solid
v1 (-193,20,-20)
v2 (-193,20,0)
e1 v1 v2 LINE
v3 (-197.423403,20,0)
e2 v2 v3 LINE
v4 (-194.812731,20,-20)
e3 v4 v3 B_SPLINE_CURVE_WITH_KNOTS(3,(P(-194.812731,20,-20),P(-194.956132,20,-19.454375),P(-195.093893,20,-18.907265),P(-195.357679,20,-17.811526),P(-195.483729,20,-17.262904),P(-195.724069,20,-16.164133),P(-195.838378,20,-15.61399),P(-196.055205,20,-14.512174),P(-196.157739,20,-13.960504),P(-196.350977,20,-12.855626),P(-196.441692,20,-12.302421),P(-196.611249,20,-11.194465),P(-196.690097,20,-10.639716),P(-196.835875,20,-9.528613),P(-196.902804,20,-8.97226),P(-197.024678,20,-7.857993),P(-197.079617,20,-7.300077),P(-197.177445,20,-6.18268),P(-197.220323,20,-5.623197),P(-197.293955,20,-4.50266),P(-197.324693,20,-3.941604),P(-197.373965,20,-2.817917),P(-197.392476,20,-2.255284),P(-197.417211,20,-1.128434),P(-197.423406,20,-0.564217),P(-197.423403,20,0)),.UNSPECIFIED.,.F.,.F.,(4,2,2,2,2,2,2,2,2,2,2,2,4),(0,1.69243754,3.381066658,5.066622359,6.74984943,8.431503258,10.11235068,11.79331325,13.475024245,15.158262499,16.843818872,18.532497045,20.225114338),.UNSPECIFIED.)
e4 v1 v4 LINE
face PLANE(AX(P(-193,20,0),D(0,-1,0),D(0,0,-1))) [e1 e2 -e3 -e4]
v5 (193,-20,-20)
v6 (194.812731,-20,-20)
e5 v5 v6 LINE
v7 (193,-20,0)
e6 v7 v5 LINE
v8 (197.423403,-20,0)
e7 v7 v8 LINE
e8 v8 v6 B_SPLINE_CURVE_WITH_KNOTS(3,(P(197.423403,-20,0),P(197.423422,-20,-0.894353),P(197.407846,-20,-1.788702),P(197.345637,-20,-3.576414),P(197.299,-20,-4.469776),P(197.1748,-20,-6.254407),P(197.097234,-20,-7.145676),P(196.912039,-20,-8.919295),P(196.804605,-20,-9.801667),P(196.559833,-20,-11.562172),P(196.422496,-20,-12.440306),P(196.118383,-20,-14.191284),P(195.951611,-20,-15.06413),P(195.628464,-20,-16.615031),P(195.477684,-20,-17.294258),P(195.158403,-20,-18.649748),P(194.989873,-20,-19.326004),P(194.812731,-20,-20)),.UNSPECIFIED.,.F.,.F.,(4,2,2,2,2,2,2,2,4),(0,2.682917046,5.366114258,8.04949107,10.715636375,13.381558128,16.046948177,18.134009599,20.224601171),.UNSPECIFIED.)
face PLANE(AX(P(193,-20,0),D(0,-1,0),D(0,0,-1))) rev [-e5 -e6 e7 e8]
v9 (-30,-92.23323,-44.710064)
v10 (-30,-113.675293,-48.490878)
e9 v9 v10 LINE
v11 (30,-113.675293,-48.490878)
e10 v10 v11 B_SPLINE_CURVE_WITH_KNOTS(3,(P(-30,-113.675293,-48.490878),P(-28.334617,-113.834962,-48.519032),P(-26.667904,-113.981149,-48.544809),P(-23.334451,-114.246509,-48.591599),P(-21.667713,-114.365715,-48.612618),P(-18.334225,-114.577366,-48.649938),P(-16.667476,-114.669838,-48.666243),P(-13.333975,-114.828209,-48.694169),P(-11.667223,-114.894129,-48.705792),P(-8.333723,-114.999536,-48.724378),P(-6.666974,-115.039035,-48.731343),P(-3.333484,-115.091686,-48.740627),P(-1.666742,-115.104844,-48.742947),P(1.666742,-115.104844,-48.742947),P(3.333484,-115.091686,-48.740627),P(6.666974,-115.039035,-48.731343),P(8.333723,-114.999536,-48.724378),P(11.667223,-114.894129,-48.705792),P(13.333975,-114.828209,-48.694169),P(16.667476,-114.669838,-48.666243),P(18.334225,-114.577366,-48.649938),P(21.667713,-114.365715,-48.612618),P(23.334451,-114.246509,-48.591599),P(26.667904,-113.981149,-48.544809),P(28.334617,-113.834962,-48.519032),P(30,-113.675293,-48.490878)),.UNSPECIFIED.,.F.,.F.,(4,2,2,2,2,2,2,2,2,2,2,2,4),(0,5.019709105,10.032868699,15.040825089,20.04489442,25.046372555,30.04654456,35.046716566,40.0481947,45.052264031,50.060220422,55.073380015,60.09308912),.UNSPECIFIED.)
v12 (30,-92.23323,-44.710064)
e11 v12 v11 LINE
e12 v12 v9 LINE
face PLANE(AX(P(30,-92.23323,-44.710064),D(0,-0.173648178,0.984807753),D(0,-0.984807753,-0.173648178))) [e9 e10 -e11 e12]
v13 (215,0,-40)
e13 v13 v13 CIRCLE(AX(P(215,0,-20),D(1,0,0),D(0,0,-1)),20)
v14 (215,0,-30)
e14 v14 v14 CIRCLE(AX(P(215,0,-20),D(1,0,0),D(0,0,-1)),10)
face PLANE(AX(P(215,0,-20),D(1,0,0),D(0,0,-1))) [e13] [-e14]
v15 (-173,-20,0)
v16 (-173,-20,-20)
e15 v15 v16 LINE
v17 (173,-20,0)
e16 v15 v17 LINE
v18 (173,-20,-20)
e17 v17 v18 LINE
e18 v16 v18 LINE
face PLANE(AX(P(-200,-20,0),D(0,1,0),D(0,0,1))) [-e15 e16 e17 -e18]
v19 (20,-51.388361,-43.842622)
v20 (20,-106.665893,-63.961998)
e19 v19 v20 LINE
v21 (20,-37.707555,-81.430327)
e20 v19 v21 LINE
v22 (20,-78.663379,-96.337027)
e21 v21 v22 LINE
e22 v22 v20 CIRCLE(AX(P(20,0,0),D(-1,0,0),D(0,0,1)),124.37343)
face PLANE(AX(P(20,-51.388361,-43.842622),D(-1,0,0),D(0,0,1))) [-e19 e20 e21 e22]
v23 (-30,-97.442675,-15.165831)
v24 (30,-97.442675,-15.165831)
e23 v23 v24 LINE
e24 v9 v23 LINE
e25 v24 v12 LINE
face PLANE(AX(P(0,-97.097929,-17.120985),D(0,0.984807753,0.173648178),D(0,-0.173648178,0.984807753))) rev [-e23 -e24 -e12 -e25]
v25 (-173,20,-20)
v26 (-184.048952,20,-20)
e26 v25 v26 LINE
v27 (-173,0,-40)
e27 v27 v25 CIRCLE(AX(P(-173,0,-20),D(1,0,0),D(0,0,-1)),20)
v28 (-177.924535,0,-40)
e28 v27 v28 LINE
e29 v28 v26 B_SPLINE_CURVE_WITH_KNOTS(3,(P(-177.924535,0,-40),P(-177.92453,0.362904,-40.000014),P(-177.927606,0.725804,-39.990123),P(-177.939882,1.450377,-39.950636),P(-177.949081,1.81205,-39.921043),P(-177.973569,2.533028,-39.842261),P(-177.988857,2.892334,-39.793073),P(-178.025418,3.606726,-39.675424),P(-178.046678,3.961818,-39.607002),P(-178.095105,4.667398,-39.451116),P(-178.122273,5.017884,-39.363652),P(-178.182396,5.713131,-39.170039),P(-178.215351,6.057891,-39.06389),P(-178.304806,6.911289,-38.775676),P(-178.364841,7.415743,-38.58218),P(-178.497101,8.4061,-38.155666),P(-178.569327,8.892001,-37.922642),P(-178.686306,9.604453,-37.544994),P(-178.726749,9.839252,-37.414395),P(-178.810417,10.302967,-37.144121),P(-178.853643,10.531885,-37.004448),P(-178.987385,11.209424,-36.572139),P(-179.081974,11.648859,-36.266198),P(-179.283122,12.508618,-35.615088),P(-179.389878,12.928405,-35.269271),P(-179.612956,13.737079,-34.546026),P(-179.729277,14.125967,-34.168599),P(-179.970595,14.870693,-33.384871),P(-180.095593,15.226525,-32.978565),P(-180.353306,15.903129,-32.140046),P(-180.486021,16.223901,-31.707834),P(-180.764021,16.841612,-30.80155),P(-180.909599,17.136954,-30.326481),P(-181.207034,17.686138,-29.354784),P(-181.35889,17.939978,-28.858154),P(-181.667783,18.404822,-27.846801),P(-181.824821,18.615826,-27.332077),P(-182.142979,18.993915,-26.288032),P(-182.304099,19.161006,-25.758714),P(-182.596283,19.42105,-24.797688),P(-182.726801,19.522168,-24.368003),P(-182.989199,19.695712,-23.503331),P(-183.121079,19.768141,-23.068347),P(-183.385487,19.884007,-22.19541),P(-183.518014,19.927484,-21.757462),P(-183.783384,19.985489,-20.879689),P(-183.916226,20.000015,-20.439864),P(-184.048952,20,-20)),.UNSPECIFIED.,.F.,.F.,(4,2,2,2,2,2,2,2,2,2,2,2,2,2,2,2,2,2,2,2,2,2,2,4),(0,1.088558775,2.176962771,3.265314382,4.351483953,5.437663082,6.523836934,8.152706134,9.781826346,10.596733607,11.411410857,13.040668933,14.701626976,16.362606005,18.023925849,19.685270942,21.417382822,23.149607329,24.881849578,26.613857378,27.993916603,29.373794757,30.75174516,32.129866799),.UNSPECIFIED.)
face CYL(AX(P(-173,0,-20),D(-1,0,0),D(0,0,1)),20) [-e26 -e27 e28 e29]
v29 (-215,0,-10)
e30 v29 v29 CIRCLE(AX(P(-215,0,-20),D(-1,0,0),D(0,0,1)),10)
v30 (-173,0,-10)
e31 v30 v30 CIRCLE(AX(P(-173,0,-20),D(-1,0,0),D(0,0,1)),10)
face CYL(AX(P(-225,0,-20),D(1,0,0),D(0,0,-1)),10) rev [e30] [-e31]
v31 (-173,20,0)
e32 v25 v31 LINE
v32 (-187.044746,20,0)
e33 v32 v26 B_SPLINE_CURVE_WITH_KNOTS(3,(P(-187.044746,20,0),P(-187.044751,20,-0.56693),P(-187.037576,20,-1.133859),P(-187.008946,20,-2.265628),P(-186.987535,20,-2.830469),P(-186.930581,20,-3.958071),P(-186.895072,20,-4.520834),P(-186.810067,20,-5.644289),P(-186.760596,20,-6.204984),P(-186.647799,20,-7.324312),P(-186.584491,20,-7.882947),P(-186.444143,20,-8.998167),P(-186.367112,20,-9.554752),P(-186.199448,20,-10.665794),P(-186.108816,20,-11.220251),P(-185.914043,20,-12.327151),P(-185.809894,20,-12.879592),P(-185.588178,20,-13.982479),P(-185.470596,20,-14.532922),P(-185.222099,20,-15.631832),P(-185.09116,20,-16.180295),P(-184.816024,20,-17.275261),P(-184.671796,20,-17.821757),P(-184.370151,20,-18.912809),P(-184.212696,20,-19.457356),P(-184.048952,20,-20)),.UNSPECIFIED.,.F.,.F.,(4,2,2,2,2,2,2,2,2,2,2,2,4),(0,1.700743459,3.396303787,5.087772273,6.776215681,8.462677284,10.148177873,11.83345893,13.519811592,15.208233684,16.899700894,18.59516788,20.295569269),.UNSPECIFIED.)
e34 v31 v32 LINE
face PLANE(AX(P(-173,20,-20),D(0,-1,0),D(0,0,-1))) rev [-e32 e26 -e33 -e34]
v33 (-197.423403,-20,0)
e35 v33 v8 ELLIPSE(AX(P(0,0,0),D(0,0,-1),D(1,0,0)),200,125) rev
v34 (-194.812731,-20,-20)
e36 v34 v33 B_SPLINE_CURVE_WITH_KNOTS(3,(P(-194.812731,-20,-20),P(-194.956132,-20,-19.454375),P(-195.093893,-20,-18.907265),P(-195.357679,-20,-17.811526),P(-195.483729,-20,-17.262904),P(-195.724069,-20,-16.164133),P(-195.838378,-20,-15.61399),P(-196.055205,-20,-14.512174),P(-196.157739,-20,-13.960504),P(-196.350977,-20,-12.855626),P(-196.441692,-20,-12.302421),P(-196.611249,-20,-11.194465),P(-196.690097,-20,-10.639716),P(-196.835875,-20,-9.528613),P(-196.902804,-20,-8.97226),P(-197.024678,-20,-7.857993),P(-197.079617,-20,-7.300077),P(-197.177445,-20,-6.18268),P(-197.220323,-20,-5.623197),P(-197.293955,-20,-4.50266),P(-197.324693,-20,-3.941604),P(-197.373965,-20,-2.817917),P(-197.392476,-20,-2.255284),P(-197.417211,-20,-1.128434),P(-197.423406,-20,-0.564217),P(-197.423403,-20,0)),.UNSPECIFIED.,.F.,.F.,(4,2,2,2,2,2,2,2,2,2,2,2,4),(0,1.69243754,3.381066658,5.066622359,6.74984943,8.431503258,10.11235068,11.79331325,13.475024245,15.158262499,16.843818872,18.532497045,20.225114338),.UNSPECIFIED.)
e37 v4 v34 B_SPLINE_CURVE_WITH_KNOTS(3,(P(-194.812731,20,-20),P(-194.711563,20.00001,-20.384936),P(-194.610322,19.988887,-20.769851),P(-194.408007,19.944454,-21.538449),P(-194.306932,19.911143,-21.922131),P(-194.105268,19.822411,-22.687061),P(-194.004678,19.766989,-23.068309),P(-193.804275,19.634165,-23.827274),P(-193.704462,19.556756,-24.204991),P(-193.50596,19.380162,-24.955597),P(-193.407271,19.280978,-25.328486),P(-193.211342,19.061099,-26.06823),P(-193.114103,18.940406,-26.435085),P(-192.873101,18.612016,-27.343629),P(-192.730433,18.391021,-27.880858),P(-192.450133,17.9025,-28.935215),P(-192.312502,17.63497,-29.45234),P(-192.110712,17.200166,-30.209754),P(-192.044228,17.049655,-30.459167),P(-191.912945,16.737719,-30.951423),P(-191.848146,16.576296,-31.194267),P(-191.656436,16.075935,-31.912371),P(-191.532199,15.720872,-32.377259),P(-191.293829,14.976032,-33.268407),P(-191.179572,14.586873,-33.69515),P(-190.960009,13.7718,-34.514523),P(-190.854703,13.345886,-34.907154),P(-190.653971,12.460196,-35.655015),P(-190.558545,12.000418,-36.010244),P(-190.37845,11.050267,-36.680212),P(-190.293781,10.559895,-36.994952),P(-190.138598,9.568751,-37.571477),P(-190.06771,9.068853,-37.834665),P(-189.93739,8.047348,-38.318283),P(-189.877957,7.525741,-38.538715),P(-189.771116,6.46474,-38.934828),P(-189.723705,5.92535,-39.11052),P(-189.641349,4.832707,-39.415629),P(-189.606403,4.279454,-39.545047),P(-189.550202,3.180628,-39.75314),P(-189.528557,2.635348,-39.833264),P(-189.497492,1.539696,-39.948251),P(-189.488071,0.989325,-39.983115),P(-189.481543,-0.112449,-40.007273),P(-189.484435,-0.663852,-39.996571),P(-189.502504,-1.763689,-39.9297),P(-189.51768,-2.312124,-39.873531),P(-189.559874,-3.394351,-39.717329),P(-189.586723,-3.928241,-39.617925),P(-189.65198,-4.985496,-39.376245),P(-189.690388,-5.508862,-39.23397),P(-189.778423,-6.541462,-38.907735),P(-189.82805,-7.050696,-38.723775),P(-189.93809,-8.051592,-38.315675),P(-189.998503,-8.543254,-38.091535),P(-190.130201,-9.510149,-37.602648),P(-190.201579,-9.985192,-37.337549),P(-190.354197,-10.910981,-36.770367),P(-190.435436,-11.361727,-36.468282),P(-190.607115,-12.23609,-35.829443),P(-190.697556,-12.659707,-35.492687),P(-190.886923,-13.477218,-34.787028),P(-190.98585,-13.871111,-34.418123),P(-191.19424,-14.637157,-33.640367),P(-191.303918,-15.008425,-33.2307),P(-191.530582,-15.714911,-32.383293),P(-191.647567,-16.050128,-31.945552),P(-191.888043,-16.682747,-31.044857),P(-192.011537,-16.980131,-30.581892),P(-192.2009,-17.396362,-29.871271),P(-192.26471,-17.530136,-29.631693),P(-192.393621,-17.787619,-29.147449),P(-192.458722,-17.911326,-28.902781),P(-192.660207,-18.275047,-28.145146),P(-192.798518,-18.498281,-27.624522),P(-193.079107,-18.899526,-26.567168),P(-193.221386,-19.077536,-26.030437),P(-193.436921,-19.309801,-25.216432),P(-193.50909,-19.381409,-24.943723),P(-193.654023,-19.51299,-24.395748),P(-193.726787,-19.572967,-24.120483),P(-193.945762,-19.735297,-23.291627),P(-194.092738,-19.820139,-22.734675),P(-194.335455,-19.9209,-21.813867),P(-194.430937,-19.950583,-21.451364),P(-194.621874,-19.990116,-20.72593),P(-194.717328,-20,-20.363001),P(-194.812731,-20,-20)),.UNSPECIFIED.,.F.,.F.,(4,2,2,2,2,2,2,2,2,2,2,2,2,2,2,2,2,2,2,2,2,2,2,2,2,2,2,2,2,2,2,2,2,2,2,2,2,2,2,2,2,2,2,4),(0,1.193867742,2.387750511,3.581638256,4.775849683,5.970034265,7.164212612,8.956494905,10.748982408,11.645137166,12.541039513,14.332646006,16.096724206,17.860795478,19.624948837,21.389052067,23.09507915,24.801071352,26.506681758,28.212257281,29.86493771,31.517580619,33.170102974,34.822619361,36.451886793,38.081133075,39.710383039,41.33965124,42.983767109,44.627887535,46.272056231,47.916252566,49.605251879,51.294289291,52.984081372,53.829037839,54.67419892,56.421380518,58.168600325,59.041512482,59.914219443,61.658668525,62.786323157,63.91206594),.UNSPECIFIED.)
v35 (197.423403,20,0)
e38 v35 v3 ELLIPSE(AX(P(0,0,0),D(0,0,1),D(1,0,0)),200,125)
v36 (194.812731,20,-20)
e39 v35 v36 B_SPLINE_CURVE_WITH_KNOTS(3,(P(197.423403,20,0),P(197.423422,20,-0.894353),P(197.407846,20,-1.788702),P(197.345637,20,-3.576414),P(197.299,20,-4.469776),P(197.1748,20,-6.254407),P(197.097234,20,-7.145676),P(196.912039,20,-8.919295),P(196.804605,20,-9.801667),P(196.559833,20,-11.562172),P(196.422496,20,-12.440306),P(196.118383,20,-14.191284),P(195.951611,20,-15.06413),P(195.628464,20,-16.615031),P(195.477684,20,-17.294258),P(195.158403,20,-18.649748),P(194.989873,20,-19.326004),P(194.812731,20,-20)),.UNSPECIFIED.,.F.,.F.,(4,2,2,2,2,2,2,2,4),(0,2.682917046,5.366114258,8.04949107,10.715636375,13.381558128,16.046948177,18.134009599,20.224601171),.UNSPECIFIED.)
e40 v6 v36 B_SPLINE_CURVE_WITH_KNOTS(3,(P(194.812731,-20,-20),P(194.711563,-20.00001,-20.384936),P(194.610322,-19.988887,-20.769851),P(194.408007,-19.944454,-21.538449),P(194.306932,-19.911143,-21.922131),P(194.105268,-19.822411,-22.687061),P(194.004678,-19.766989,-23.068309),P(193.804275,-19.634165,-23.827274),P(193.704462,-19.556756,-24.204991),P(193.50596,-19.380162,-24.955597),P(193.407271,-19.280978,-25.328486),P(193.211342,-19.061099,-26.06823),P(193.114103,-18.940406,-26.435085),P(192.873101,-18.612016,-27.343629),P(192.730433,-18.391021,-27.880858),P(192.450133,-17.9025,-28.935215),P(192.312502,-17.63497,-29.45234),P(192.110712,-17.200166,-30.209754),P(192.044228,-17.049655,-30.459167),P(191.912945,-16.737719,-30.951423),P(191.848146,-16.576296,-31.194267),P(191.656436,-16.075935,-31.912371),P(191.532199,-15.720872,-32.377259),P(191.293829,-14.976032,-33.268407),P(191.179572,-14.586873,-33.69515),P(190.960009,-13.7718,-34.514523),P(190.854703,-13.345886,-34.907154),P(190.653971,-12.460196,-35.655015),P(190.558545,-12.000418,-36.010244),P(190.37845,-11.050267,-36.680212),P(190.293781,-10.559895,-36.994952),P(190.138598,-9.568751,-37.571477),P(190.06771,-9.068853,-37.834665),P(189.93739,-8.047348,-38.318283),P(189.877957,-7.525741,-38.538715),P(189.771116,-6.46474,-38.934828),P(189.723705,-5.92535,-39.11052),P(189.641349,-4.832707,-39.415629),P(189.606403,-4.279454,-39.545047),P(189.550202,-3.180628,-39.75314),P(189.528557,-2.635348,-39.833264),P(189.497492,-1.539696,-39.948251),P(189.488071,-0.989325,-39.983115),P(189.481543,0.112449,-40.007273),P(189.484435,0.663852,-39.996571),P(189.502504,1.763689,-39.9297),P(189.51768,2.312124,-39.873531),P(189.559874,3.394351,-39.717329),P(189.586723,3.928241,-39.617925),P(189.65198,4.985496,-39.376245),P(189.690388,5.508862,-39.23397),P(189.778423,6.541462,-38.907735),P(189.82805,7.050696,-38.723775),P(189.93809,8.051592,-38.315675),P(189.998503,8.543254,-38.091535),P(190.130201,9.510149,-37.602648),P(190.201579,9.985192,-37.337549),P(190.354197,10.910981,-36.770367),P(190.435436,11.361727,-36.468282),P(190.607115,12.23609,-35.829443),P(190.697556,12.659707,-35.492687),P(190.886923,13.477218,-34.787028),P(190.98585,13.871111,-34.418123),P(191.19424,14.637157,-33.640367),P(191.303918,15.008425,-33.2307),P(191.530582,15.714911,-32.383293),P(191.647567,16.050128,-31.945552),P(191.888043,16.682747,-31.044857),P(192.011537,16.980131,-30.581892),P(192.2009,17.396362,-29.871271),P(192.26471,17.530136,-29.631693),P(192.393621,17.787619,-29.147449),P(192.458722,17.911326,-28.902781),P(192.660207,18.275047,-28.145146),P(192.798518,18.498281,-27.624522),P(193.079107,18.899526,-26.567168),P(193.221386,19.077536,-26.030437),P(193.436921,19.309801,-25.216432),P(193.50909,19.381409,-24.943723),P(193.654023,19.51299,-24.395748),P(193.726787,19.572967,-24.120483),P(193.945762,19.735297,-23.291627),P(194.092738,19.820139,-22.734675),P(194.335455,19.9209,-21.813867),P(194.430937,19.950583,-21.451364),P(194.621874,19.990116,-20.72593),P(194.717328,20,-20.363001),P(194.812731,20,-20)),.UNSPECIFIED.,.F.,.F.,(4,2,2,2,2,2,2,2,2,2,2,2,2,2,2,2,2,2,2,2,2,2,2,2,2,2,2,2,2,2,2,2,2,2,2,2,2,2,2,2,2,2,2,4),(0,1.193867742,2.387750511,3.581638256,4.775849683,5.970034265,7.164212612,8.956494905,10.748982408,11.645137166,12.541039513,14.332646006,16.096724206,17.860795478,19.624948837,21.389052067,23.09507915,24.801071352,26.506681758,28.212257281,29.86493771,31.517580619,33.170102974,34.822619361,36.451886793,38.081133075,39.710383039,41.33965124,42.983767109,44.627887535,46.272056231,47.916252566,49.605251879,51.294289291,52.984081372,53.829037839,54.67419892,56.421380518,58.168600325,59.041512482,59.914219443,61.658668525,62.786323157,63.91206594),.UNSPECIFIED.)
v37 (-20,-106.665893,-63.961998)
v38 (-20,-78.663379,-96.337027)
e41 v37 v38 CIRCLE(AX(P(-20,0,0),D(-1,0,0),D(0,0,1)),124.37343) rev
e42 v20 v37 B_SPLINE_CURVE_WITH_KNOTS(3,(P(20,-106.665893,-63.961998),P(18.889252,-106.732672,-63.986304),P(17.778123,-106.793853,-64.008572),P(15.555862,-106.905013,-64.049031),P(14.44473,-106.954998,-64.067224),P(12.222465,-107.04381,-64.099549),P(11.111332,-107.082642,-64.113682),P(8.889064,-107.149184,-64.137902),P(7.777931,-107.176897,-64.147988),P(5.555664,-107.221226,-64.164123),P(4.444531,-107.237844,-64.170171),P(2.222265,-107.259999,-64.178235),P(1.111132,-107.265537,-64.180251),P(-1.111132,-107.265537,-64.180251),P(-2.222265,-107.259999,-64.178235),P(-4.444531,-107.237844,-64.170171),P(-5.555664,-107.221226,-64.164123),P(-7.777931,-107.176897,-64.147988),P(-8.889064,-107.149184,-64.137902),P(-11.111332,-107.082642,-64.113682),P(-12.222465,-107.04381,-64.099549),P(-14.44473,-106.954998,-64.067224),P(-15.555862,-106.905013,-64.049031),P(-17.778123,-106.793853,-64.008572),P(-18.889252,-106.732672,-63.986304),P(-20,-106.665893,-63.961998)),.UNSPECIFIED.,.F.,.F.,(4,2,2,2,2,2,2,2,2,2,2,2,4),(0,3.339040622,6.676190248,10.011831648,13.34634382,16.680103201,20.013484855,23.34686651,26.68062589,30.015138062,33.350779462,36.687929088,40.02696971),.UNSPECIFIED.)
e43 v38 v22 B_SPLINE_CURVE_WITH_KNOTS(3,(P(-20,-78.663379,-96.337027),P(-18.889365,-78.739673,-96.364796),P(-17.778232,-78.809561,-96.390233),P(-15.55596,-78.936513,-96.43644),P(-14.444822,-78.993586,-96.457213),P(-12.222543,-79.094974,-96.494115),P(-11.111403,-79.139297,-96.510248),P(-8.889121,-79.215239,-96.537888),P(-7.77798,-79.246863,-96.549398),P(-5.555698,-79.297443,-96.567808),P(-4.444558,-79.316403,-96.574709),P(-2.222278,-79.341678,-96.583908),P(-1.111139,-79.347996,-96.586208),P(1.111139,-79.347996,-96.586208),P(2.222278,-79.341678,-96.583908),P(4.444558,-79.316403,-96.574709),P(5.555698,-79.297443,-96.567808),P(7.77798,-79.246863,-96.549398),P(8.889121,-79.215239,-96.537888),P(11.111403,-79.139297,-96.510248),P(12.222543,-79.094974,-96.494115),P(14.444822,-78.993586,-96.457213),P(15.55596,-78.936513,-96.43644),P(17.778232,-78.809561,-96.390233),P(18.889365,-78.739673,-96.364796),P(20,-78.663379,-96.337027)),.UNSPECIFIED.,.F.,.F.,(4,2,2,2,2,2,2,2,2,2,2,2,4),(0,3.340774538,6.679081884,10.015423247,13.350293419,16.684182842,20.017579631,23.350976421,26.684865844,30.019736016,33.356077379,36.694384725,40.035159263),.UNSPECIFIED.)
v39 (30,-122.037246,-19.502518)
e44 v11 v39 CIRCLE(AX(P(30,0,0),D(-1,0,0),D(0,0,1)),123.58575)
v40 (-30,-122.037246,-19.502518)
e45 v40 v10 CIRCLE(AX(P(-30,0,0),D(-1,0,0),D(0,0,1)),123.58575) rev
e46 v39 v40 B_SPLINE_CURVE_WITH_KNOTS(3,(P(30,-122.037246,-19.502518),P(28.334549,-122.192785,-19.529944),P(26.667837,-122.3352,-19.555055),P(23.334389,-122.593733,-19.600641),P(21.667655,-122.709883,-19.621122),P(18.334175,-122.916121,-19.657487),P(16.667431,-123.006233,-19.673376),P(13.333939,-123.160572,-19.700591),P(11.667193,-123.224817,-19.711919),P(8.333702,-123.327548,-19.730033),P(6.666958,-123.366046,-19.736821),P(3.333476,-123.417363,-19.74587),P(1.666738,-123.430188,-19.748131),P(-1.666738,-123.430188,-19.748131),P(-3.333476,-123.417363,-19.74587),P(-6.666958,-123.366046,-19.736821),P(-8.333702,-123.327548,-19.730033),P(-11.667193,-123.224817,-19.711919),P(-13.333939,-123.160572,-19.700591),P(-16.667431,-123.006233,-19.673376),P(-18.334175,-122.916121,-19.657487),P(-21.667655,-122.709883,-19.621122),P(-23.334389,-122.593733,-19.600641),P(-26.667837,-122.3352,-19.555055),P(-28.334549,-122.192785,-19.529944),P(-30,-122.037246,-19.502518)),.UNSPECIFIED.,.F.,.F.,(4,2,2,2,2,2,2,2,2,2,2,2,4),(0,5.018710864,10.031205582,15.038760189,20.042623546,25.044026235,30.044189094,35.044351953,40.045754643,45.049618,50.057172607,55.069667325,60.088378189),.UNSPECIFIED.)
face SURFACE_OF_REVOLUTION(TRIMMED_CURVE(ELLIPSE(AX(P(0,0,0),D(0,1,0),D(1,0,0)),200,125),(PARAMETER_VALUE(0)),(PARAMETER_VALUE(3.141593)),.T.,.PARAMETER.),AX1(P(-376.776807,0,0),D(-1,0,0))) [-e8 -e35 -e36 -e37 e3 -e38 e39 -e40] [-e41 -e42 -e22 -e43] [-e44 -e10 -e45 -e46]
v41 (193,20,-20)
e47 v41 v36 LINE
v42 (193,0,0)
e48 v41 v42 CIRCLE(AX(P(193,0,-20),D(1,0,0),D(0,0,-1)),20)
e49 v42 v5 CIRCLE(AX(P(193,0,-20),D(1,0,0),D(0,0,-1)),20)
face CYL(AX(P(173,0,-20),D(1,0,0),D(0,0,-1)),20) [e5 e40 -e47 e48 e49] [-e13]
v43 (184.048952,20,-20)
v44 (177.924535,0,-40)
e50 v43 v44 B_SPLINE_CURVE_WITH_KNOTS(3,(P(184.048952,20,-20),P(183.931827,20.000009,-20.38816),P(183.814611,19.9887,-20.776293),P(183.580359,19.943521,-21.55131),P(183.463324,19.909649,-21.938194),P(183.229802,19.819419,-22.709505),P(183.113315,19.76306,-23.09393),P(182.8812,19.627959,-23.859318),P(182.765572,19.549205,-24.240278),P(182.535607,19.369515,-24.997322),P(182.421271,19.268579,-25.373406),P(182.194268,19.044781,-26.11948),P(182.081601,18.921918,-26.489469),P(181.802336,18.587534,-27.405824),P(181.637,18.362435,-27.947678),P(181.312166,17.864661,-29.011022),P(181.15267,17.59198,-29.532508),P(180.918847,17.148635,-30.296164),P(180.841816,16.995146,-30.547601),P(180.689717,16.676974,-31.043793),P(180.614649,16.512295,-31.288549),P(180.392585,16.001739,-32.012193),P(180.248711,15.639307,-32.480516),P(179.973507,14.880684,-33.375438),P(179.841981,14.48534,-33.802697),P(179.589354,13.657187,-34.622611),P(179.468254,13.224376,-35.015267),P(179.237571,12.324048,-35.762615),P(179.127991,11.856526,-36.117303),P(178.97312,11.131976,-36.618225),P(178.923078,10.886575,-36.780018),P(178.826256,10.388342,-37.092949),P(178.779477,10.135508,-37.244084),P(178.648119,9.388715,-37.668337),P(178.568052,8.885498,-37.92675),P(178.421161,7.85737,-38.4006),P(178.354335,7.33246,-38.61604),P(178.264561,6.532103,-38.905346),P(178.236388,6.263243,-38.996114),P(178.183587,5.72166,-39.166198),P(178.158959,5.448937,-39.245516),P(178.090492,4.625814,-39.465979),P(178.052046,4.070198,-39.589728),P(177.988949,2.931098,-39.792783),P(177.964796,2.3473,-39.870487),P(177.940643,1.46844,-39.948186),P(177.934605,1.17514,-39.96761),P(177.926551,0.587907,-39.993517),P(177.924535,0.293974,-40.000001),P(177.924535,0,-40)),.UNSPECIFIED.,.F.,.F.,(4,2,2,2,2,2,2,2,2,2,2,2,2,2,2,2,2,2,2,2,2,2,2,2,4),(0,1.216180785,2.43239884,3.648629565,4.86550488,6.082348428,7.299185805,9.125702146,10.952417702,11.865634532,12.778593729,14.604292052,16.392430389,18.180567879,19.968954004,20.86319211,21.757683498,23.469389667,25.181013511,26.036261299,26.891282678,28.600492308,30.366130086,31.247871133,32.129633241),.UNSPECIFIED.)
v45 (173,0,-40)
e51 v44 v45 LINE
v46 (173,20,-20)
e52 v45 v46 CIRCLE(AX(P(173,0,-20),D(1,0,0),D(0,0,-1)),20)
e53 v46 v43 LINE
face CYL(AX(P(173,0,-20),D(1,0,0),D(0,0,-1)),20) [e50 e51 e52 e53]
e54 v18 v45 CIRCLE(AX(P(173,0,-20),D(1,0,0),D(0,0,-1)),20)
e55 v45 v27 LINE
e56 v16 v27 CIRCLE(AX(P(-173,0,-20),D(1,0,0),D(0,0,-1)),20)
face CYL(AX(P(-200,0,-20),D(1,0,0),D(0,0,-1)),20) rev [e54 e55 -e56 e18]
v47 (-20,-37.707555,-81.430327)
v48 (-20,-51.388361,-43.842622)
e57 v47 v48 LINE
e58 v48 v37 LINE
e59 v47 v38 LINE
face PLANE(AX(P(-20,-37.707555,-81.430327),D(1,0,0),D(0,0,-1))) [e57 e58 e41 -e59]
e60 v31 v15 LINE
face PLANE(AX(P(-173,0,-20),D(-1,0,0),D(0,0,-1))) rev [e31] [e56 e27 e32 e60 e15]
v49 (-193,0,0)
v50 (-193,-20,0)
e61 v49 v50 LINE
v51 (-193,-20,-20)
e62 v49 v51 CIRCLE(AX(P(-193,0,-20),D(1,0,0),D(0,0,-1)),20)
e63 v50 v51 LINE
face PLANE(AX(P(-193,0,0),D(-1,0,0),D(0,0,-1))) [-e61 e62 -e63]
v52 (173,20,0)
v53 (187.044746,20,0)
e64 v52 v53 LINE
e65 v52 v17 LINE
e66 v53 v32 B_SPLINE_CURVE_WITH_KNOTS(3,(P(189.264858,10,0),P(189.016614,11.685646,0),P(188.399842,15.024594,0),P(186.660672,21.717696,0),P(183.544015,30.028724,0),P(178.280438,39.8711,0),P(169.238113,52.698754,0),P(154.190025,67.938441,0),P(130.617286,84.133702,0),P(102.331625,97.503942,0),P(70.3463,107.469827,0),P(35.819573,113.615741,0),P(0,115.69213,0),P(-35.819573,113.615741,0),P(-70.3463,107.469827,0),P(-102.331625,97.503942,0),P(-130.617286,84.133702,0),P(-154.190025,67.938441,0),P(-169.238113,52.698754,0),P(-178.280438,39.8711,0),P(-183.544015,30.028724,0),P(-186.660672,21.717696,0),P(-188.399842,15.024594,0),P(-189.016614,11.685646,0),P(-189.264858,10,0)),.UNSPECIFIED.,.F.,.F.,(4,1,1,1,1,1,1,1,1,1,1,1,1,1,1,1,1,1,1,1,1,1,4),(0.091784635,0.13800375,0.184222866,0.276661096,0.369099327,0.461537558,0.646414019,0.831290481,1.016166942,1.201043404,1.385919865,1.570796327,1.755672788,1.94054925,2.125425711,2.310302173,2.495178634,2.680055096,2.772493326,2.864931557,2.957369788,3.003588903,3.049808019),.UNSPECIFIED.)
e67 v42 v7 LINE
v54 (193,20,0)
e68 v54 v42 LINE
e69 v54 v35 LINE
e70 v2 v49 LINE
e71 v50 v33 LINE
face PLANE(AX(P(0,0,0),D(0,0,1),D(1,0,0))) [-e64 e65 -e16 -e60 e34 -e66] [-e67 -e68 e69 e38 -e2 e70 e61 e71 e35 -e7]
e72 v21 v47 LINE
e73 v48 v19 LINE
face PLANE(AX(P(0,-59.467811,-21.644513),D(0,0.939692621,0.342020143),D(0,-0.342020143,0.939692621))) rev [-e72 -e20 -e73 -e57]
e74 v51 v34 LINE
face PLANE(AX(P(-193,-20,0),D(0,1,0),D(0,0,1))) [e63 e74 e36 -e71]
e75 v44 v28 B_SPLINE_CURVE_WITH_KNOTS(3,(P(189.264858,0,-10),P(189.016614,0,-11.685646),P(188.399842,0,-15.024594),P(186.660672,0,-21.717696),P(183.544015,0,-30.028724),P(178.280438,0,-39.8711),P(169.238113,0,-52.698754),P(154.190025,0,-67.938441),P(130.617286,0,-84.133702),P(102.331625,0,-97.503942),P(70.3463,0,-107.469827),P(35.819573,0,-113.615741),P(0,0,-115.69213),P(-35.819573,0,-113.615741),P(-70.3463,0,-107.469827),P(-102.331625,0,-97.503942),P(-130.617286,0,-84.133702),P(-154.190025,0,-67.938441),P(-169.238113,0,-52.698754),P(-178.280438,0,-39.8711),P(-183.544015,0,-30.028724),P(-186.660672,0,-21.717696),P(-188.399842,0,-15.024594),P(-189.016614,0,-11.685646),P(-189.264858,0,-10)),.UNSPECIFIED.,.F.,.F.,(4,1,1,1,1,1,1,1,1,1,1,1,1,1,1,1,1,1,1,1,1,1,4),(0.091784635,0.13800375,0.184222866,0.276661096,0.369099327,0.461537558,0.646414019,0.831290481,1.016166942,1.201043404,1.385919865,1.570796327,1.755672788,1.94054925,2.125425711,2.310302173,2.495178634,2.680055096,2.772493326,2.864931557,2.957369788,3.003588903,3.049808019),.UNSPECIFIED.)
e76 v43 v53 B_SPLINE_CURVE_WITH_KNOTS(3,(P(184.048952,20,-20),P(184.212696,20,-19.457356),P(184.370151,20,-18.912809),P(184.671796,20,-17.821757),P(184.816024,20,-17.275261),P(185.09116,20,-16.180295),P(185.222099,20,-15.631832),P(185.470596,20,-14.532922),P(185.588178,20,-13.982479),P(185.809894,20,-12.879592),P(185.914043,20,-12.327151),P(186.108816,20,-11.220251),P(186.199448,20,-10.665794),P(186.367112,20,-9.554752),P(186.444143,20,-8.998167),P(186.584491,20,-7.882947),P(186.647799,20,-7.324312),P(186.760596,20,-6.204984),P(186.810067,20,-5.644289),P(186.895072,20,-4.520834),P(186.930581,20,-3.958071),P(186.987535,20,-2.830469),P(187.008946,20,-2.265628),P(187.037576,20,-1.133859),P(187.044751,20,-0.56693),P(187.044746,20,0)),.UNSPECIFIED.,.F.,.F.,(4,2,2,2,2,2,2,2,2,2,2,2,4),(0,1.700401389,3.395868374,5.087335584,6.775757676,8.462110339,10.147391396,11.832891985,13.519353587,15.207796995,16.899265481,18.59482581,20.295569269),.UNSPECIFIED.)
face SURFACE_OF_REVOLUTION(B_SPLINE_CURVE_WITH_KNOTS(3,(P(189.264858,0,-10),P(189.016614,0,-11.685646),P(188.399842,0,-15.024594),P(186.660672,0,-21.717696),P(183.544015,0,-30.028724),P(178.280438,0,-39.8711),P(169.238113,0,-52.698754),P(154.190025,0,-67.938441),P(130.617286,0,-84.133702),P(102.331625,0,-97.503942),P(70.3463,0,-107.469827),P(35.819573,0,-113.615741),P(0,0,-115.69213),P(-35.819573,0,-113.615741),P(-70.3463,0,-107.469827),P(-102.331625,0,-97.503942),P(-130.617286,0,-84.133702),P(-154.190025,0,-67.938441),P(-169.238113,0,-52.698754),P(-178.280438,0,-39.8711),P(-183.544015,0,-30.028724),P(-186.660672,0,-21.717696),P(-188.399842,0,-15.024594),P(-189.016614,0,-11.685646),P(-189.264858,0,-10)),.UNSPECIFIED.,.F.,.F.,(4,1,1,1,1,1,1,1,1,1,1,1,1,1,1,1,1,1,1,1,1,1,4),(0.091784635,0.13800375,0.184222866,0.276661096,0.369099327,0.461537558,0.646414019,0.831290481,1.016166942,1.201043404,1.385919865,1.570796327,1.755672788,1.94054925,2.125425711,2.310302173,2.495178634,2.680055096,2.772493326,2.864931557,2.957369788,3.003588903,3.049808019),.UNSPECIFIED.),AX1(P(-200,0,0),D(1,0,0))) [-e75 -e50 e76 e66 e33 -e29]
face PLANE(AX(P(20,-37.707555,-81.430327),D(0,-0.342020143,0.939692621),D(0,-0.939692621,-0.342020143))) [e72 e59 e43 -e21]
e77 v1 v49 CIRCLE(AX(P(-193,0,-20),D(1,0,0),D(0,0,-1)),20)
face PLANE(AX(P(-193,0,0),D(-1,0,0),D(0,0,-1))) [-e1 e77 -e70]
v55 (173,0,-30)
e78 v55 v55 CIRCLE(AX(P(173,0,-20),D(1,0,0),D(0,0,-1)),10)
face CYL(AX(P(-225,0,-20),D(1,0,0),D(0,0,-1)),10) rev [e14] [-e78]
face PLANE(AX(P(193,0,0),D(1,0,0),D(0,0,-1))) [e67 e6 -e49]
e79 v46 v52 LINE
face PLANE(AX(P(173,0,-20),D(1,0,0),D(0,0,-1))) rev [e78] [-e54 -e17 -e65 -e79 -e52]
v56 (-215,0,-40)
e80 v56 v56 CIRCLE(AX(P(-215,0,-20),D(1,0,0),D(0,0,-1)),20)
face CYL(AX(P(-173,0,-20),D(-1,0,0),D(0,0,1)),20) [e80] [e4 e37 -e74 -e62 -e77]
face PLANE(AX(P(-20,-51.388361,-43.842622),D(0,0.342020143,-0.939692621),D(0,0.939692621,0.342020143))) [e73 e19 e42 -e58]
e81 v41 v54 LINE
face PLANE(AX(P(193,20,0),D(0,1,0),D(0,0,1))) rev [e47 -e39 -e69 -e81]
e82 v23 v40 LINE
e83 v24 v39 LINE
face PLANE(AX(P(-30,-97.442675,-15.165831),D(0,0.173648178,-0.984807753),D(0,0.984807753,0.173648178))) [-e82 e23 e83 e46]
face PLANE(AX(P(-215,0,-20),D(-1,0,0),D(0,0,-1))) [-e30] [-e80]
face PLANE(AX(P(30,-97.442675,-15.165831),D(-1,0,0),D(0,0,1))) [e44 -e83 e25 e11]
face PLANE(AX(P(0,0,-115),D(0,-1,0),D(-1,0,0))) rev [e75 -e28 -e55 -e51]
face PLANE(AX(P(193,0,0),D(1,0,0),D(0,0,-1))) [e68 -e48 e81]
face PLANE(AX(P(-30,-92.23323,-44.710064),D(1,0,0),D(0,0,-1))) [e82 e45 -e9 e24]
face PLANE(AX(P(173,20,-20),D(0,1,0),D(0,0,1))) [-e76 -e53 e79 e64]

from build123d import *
from build123d.topology import SkipClean

# Parameters (mm, degrees)
SKETCH_3_W          = 40
SKETCH_3_H          = 40
CUT_EXTRUDE_1_DEPTH = 70
CUT_REVOLVE_1_ANGLE = 90
CUT_EXTRUDE_2_DEPTH = 452.082032598
EXTRUDE_1_DEPTH     = 42
SKETCH_7_R          = 10
CUT_EXTRUDE_3_DEPTH = 440
CUT_EXTRUDE_4_DEPTH = 22
SKETCH_9_W          = 60
SKETCH_9_H          = 30
CUT_EXTRUDE_5_DEPTH = 30


with BuildPart() as part:
    # 草图1 → 旋转3 (revolve)
    with SkipClean():  # the faces are left unmerged after this step: merging them gives an invalid solid
        with BuildSketch(Plane(origin=(0, 0, 0), x_dir=(1, 0, 0), z_dir=(0, 1, 0))):
            with BuildLine():
                add(Edge.make_bspline(
                    [(200, 0), (200, 125), (0, 125), (-200, 125), (-200, 0)],
                    knots=[0, 0, 0, 1.570796327, 1.570796327, 3.141592654, 3.141592654, 3.141592654], degree=2, weights=[1, 0.707106781, 1, 0.707106781, 1]))
                Line((-200, 0), (200, 0))
            make_face()
            with BuildLine():
                Line((200, 0), (-200, 0))
                add(Edge.make_bspline(
                    [(-200, 0), (-200, -125), (0, -125), (200, -125), (200, 0)],
                    knots=[3.141592654, 3.141592654, 3.141592654, 4.71238898, 4.71238898, 6.283185307, 6.283185307, 6.283185307], degree=2, weights=[1, 0.707106781, 1, 0.707106781, 1]))
            make_face()
        revolve(axis=Axis((-376.776806715, 0, 0), (1, 0, 0)))
    add(part.part.scale(1), mode=Mode.REPLACE)  # the faces are merged on a copy

    # Surface Cut 1
    split(bisect_by=Plane.XY, keep=Keep.BOTTOM)

    # 草图3 → 切除-拉伸1 (cut)
    with BuildSketch(Plane(origin=(0, -125.246294878, -45.585923288), x_dir=(1, 0, 0), z_dir=(0, 0.9396926207859081, 0.34202014332566943))):
        with Locations((0, 43.622733675)):
            Rectangle(SKETCH_3_W, SKETCH_3_H)
    extrude(amount=CUT_EXTRUDE_1_DEPTH, mode=Mode.SUBTRACT)

    # 草图4 → 切除-旋转1 (revolve, cut)
    with BuildSketch(Plane.XY):
        with BuildLine():
            Line((-189.264857791, 10), (189.264857791, 10))
            add(Edge.make_bspline(
                [(189.264857791, 10), (189.01661408, 11.685645813), (188.399842232, 15.02459428), (186.660672029, 21.717695752), (183.544014825, 30.028723701), (178.280438028, 39.871100011), (169.238112825, 52.698753606), (154.190025082, 67.938441209), (130.617285564, 84.133702491), (102.331625356, 97.503941795), (70.346299789, 107.469826997), (35.819572857, 113.615740598), (0, 115.692129701), (-35.819572857, 113.615740598), (-70.346299789, 107.469826997), (-102.331625356, 97.503941795), (-130.617285564, 84.133702491), (-154.190025082, 67.938441209), (-169.238112825, 52.698753606), (-178.280438028, 39.871100011), (-183.544014825, 30.028723701), (-186.660672029, 21.717695752), (-188.399842232, 15.02459428), (-189.01661408, 11.685645813), (-189.264857791, 10)],
                knots=[0.091784635, 0.091784635, 0.091784635, 0.091784635, 0.13800375, 0.184222866, 0.276661096, 0.369099327, 0.461537558, 0.646414019, 0.831290481, 1.016166942, 1.201043404, 1.385919865, 1.570796327, 1.755672788, 1.94054925, 2.125425711, 2.310302173, 2.495178634, 2.680055096, 2.772493326, 2.864931557, 2.957369788, 3.003588903, 3.049808019, 3.049808019, 3.049808019, 3.049808019], degree=3))
        make_face()
    revolve(axis=Axis((-200, 0, 0), (-1, 0, 0)), revolution_arc=CUT_REVOLVE_1_ANGLE, mode=Mode.SUBTRACT)

    # 草图5 → 切除-拉伸2 (cut, through all)
    with BuildSketch(Plane(origin=(215, 0, 0), x_dir=(0, 0, -1), z_dir=(1, 0, 0))):
        with BuildLine():
            ThreePointArc((20, 20), (40, 0), (20, -20))
            Line((20, -20), (0, -20))
            Line((0, -20), (0, 20))
            Line((0, 20), (20, 20))
        make_face()
    extrude(amount=-CUT_EXTRUDE_2_DEPTH, mode=Mode.SUBTRACT)

    # 草图6 → 凸台-拉伸1 (add)
    with BuildSketch(Plane(origin=(215, 0, 0), x_dir=(0, 0, -1), z_dir=(1, 0, 0))):
        with BuildLine():
            Line((20, -20), (0, -20))
            Line((0, -20), (0, 20))
            Line((0, 20), (20, 20))
            ThreePointArc((20, 20), (40, 0), (20, -20))
        make_face()
    extrude_1 = extrude(amount=-EXTRUDE_1_DEPTH)

    # 镜向1: 凸台-拉伸1 across plane
    add(extrude_1.mirror(Plane(origin=(0, 0, 0), x_dir=(0, 0, 1), z_dir=(1, 0, 0))))

    # 草图7 → 切除-拉伸3 (cut)
    with BuildSketch(Plane(origin=(215, 0, 0), x_dir=(0, 0, -1), z_dir=(1, 0, 0))):
        with Locations(Location((20, 0, 0), (0, 0, 180))):
            Circle(SKETCH_7_R)
    extrude(amount=-CUT_EXTRUDE_3_DEPTH, mode=Mode.SUBTRACT)

    # 草图8 → 切除-拉伸4 (cut)
    with BuildSketch(Plane(origin=(215, 0, 0), x_dir=(0, 0, -1), z_dir=(1, 0, 0))):
        with BuildLine():
            ThreePointArc((0, 4.7e-08), (5.857864393, 14.14213564), (20, 20))
            Line((20, 20), (0, 20))
            Line((0, 20), (0, 4.7e-08))
        make_face()
        with BuildLine():
            ThreePointArc((20, -20), (5.85786436, -14.142135607), (0, 4.7e-08))
            Line((0, 4.7e-08), (0, -20))
            Line((0, -20), (20, -20))
        make_face()
    cut_extrude_4 = extrude(amount=-CUT_EXTRUDE_4_DEPTH, mode=Mode.SUBTRACT)

    # 镜向2: 切除-拉伸4 across plane
    add(cut_extrude_4.mirror(Plane(origin=(0, 0, 0), x_dir=(0, 0, 1), z_dir=(1, 0, 0))), mode=Mode.SUBTRACT)

    # 草图9 → 切除-拉伸5 (cut)
    with BuildSketch(Plane(origin=(0, -126.642161547, -22.330429976), x_dir=(1, 0, 0), z_dir=(0, 0.984807753012208, 0.17364817766693072))):
        with Locations((0, 13.014685424)):
            Rectangle(SKETCH_9_W, SKETCH_9_H)
    extrude(amount=CUT_EXTRUDE_5_DEPTH, mode=Mode.SUBTRACT)


solid = part.part
